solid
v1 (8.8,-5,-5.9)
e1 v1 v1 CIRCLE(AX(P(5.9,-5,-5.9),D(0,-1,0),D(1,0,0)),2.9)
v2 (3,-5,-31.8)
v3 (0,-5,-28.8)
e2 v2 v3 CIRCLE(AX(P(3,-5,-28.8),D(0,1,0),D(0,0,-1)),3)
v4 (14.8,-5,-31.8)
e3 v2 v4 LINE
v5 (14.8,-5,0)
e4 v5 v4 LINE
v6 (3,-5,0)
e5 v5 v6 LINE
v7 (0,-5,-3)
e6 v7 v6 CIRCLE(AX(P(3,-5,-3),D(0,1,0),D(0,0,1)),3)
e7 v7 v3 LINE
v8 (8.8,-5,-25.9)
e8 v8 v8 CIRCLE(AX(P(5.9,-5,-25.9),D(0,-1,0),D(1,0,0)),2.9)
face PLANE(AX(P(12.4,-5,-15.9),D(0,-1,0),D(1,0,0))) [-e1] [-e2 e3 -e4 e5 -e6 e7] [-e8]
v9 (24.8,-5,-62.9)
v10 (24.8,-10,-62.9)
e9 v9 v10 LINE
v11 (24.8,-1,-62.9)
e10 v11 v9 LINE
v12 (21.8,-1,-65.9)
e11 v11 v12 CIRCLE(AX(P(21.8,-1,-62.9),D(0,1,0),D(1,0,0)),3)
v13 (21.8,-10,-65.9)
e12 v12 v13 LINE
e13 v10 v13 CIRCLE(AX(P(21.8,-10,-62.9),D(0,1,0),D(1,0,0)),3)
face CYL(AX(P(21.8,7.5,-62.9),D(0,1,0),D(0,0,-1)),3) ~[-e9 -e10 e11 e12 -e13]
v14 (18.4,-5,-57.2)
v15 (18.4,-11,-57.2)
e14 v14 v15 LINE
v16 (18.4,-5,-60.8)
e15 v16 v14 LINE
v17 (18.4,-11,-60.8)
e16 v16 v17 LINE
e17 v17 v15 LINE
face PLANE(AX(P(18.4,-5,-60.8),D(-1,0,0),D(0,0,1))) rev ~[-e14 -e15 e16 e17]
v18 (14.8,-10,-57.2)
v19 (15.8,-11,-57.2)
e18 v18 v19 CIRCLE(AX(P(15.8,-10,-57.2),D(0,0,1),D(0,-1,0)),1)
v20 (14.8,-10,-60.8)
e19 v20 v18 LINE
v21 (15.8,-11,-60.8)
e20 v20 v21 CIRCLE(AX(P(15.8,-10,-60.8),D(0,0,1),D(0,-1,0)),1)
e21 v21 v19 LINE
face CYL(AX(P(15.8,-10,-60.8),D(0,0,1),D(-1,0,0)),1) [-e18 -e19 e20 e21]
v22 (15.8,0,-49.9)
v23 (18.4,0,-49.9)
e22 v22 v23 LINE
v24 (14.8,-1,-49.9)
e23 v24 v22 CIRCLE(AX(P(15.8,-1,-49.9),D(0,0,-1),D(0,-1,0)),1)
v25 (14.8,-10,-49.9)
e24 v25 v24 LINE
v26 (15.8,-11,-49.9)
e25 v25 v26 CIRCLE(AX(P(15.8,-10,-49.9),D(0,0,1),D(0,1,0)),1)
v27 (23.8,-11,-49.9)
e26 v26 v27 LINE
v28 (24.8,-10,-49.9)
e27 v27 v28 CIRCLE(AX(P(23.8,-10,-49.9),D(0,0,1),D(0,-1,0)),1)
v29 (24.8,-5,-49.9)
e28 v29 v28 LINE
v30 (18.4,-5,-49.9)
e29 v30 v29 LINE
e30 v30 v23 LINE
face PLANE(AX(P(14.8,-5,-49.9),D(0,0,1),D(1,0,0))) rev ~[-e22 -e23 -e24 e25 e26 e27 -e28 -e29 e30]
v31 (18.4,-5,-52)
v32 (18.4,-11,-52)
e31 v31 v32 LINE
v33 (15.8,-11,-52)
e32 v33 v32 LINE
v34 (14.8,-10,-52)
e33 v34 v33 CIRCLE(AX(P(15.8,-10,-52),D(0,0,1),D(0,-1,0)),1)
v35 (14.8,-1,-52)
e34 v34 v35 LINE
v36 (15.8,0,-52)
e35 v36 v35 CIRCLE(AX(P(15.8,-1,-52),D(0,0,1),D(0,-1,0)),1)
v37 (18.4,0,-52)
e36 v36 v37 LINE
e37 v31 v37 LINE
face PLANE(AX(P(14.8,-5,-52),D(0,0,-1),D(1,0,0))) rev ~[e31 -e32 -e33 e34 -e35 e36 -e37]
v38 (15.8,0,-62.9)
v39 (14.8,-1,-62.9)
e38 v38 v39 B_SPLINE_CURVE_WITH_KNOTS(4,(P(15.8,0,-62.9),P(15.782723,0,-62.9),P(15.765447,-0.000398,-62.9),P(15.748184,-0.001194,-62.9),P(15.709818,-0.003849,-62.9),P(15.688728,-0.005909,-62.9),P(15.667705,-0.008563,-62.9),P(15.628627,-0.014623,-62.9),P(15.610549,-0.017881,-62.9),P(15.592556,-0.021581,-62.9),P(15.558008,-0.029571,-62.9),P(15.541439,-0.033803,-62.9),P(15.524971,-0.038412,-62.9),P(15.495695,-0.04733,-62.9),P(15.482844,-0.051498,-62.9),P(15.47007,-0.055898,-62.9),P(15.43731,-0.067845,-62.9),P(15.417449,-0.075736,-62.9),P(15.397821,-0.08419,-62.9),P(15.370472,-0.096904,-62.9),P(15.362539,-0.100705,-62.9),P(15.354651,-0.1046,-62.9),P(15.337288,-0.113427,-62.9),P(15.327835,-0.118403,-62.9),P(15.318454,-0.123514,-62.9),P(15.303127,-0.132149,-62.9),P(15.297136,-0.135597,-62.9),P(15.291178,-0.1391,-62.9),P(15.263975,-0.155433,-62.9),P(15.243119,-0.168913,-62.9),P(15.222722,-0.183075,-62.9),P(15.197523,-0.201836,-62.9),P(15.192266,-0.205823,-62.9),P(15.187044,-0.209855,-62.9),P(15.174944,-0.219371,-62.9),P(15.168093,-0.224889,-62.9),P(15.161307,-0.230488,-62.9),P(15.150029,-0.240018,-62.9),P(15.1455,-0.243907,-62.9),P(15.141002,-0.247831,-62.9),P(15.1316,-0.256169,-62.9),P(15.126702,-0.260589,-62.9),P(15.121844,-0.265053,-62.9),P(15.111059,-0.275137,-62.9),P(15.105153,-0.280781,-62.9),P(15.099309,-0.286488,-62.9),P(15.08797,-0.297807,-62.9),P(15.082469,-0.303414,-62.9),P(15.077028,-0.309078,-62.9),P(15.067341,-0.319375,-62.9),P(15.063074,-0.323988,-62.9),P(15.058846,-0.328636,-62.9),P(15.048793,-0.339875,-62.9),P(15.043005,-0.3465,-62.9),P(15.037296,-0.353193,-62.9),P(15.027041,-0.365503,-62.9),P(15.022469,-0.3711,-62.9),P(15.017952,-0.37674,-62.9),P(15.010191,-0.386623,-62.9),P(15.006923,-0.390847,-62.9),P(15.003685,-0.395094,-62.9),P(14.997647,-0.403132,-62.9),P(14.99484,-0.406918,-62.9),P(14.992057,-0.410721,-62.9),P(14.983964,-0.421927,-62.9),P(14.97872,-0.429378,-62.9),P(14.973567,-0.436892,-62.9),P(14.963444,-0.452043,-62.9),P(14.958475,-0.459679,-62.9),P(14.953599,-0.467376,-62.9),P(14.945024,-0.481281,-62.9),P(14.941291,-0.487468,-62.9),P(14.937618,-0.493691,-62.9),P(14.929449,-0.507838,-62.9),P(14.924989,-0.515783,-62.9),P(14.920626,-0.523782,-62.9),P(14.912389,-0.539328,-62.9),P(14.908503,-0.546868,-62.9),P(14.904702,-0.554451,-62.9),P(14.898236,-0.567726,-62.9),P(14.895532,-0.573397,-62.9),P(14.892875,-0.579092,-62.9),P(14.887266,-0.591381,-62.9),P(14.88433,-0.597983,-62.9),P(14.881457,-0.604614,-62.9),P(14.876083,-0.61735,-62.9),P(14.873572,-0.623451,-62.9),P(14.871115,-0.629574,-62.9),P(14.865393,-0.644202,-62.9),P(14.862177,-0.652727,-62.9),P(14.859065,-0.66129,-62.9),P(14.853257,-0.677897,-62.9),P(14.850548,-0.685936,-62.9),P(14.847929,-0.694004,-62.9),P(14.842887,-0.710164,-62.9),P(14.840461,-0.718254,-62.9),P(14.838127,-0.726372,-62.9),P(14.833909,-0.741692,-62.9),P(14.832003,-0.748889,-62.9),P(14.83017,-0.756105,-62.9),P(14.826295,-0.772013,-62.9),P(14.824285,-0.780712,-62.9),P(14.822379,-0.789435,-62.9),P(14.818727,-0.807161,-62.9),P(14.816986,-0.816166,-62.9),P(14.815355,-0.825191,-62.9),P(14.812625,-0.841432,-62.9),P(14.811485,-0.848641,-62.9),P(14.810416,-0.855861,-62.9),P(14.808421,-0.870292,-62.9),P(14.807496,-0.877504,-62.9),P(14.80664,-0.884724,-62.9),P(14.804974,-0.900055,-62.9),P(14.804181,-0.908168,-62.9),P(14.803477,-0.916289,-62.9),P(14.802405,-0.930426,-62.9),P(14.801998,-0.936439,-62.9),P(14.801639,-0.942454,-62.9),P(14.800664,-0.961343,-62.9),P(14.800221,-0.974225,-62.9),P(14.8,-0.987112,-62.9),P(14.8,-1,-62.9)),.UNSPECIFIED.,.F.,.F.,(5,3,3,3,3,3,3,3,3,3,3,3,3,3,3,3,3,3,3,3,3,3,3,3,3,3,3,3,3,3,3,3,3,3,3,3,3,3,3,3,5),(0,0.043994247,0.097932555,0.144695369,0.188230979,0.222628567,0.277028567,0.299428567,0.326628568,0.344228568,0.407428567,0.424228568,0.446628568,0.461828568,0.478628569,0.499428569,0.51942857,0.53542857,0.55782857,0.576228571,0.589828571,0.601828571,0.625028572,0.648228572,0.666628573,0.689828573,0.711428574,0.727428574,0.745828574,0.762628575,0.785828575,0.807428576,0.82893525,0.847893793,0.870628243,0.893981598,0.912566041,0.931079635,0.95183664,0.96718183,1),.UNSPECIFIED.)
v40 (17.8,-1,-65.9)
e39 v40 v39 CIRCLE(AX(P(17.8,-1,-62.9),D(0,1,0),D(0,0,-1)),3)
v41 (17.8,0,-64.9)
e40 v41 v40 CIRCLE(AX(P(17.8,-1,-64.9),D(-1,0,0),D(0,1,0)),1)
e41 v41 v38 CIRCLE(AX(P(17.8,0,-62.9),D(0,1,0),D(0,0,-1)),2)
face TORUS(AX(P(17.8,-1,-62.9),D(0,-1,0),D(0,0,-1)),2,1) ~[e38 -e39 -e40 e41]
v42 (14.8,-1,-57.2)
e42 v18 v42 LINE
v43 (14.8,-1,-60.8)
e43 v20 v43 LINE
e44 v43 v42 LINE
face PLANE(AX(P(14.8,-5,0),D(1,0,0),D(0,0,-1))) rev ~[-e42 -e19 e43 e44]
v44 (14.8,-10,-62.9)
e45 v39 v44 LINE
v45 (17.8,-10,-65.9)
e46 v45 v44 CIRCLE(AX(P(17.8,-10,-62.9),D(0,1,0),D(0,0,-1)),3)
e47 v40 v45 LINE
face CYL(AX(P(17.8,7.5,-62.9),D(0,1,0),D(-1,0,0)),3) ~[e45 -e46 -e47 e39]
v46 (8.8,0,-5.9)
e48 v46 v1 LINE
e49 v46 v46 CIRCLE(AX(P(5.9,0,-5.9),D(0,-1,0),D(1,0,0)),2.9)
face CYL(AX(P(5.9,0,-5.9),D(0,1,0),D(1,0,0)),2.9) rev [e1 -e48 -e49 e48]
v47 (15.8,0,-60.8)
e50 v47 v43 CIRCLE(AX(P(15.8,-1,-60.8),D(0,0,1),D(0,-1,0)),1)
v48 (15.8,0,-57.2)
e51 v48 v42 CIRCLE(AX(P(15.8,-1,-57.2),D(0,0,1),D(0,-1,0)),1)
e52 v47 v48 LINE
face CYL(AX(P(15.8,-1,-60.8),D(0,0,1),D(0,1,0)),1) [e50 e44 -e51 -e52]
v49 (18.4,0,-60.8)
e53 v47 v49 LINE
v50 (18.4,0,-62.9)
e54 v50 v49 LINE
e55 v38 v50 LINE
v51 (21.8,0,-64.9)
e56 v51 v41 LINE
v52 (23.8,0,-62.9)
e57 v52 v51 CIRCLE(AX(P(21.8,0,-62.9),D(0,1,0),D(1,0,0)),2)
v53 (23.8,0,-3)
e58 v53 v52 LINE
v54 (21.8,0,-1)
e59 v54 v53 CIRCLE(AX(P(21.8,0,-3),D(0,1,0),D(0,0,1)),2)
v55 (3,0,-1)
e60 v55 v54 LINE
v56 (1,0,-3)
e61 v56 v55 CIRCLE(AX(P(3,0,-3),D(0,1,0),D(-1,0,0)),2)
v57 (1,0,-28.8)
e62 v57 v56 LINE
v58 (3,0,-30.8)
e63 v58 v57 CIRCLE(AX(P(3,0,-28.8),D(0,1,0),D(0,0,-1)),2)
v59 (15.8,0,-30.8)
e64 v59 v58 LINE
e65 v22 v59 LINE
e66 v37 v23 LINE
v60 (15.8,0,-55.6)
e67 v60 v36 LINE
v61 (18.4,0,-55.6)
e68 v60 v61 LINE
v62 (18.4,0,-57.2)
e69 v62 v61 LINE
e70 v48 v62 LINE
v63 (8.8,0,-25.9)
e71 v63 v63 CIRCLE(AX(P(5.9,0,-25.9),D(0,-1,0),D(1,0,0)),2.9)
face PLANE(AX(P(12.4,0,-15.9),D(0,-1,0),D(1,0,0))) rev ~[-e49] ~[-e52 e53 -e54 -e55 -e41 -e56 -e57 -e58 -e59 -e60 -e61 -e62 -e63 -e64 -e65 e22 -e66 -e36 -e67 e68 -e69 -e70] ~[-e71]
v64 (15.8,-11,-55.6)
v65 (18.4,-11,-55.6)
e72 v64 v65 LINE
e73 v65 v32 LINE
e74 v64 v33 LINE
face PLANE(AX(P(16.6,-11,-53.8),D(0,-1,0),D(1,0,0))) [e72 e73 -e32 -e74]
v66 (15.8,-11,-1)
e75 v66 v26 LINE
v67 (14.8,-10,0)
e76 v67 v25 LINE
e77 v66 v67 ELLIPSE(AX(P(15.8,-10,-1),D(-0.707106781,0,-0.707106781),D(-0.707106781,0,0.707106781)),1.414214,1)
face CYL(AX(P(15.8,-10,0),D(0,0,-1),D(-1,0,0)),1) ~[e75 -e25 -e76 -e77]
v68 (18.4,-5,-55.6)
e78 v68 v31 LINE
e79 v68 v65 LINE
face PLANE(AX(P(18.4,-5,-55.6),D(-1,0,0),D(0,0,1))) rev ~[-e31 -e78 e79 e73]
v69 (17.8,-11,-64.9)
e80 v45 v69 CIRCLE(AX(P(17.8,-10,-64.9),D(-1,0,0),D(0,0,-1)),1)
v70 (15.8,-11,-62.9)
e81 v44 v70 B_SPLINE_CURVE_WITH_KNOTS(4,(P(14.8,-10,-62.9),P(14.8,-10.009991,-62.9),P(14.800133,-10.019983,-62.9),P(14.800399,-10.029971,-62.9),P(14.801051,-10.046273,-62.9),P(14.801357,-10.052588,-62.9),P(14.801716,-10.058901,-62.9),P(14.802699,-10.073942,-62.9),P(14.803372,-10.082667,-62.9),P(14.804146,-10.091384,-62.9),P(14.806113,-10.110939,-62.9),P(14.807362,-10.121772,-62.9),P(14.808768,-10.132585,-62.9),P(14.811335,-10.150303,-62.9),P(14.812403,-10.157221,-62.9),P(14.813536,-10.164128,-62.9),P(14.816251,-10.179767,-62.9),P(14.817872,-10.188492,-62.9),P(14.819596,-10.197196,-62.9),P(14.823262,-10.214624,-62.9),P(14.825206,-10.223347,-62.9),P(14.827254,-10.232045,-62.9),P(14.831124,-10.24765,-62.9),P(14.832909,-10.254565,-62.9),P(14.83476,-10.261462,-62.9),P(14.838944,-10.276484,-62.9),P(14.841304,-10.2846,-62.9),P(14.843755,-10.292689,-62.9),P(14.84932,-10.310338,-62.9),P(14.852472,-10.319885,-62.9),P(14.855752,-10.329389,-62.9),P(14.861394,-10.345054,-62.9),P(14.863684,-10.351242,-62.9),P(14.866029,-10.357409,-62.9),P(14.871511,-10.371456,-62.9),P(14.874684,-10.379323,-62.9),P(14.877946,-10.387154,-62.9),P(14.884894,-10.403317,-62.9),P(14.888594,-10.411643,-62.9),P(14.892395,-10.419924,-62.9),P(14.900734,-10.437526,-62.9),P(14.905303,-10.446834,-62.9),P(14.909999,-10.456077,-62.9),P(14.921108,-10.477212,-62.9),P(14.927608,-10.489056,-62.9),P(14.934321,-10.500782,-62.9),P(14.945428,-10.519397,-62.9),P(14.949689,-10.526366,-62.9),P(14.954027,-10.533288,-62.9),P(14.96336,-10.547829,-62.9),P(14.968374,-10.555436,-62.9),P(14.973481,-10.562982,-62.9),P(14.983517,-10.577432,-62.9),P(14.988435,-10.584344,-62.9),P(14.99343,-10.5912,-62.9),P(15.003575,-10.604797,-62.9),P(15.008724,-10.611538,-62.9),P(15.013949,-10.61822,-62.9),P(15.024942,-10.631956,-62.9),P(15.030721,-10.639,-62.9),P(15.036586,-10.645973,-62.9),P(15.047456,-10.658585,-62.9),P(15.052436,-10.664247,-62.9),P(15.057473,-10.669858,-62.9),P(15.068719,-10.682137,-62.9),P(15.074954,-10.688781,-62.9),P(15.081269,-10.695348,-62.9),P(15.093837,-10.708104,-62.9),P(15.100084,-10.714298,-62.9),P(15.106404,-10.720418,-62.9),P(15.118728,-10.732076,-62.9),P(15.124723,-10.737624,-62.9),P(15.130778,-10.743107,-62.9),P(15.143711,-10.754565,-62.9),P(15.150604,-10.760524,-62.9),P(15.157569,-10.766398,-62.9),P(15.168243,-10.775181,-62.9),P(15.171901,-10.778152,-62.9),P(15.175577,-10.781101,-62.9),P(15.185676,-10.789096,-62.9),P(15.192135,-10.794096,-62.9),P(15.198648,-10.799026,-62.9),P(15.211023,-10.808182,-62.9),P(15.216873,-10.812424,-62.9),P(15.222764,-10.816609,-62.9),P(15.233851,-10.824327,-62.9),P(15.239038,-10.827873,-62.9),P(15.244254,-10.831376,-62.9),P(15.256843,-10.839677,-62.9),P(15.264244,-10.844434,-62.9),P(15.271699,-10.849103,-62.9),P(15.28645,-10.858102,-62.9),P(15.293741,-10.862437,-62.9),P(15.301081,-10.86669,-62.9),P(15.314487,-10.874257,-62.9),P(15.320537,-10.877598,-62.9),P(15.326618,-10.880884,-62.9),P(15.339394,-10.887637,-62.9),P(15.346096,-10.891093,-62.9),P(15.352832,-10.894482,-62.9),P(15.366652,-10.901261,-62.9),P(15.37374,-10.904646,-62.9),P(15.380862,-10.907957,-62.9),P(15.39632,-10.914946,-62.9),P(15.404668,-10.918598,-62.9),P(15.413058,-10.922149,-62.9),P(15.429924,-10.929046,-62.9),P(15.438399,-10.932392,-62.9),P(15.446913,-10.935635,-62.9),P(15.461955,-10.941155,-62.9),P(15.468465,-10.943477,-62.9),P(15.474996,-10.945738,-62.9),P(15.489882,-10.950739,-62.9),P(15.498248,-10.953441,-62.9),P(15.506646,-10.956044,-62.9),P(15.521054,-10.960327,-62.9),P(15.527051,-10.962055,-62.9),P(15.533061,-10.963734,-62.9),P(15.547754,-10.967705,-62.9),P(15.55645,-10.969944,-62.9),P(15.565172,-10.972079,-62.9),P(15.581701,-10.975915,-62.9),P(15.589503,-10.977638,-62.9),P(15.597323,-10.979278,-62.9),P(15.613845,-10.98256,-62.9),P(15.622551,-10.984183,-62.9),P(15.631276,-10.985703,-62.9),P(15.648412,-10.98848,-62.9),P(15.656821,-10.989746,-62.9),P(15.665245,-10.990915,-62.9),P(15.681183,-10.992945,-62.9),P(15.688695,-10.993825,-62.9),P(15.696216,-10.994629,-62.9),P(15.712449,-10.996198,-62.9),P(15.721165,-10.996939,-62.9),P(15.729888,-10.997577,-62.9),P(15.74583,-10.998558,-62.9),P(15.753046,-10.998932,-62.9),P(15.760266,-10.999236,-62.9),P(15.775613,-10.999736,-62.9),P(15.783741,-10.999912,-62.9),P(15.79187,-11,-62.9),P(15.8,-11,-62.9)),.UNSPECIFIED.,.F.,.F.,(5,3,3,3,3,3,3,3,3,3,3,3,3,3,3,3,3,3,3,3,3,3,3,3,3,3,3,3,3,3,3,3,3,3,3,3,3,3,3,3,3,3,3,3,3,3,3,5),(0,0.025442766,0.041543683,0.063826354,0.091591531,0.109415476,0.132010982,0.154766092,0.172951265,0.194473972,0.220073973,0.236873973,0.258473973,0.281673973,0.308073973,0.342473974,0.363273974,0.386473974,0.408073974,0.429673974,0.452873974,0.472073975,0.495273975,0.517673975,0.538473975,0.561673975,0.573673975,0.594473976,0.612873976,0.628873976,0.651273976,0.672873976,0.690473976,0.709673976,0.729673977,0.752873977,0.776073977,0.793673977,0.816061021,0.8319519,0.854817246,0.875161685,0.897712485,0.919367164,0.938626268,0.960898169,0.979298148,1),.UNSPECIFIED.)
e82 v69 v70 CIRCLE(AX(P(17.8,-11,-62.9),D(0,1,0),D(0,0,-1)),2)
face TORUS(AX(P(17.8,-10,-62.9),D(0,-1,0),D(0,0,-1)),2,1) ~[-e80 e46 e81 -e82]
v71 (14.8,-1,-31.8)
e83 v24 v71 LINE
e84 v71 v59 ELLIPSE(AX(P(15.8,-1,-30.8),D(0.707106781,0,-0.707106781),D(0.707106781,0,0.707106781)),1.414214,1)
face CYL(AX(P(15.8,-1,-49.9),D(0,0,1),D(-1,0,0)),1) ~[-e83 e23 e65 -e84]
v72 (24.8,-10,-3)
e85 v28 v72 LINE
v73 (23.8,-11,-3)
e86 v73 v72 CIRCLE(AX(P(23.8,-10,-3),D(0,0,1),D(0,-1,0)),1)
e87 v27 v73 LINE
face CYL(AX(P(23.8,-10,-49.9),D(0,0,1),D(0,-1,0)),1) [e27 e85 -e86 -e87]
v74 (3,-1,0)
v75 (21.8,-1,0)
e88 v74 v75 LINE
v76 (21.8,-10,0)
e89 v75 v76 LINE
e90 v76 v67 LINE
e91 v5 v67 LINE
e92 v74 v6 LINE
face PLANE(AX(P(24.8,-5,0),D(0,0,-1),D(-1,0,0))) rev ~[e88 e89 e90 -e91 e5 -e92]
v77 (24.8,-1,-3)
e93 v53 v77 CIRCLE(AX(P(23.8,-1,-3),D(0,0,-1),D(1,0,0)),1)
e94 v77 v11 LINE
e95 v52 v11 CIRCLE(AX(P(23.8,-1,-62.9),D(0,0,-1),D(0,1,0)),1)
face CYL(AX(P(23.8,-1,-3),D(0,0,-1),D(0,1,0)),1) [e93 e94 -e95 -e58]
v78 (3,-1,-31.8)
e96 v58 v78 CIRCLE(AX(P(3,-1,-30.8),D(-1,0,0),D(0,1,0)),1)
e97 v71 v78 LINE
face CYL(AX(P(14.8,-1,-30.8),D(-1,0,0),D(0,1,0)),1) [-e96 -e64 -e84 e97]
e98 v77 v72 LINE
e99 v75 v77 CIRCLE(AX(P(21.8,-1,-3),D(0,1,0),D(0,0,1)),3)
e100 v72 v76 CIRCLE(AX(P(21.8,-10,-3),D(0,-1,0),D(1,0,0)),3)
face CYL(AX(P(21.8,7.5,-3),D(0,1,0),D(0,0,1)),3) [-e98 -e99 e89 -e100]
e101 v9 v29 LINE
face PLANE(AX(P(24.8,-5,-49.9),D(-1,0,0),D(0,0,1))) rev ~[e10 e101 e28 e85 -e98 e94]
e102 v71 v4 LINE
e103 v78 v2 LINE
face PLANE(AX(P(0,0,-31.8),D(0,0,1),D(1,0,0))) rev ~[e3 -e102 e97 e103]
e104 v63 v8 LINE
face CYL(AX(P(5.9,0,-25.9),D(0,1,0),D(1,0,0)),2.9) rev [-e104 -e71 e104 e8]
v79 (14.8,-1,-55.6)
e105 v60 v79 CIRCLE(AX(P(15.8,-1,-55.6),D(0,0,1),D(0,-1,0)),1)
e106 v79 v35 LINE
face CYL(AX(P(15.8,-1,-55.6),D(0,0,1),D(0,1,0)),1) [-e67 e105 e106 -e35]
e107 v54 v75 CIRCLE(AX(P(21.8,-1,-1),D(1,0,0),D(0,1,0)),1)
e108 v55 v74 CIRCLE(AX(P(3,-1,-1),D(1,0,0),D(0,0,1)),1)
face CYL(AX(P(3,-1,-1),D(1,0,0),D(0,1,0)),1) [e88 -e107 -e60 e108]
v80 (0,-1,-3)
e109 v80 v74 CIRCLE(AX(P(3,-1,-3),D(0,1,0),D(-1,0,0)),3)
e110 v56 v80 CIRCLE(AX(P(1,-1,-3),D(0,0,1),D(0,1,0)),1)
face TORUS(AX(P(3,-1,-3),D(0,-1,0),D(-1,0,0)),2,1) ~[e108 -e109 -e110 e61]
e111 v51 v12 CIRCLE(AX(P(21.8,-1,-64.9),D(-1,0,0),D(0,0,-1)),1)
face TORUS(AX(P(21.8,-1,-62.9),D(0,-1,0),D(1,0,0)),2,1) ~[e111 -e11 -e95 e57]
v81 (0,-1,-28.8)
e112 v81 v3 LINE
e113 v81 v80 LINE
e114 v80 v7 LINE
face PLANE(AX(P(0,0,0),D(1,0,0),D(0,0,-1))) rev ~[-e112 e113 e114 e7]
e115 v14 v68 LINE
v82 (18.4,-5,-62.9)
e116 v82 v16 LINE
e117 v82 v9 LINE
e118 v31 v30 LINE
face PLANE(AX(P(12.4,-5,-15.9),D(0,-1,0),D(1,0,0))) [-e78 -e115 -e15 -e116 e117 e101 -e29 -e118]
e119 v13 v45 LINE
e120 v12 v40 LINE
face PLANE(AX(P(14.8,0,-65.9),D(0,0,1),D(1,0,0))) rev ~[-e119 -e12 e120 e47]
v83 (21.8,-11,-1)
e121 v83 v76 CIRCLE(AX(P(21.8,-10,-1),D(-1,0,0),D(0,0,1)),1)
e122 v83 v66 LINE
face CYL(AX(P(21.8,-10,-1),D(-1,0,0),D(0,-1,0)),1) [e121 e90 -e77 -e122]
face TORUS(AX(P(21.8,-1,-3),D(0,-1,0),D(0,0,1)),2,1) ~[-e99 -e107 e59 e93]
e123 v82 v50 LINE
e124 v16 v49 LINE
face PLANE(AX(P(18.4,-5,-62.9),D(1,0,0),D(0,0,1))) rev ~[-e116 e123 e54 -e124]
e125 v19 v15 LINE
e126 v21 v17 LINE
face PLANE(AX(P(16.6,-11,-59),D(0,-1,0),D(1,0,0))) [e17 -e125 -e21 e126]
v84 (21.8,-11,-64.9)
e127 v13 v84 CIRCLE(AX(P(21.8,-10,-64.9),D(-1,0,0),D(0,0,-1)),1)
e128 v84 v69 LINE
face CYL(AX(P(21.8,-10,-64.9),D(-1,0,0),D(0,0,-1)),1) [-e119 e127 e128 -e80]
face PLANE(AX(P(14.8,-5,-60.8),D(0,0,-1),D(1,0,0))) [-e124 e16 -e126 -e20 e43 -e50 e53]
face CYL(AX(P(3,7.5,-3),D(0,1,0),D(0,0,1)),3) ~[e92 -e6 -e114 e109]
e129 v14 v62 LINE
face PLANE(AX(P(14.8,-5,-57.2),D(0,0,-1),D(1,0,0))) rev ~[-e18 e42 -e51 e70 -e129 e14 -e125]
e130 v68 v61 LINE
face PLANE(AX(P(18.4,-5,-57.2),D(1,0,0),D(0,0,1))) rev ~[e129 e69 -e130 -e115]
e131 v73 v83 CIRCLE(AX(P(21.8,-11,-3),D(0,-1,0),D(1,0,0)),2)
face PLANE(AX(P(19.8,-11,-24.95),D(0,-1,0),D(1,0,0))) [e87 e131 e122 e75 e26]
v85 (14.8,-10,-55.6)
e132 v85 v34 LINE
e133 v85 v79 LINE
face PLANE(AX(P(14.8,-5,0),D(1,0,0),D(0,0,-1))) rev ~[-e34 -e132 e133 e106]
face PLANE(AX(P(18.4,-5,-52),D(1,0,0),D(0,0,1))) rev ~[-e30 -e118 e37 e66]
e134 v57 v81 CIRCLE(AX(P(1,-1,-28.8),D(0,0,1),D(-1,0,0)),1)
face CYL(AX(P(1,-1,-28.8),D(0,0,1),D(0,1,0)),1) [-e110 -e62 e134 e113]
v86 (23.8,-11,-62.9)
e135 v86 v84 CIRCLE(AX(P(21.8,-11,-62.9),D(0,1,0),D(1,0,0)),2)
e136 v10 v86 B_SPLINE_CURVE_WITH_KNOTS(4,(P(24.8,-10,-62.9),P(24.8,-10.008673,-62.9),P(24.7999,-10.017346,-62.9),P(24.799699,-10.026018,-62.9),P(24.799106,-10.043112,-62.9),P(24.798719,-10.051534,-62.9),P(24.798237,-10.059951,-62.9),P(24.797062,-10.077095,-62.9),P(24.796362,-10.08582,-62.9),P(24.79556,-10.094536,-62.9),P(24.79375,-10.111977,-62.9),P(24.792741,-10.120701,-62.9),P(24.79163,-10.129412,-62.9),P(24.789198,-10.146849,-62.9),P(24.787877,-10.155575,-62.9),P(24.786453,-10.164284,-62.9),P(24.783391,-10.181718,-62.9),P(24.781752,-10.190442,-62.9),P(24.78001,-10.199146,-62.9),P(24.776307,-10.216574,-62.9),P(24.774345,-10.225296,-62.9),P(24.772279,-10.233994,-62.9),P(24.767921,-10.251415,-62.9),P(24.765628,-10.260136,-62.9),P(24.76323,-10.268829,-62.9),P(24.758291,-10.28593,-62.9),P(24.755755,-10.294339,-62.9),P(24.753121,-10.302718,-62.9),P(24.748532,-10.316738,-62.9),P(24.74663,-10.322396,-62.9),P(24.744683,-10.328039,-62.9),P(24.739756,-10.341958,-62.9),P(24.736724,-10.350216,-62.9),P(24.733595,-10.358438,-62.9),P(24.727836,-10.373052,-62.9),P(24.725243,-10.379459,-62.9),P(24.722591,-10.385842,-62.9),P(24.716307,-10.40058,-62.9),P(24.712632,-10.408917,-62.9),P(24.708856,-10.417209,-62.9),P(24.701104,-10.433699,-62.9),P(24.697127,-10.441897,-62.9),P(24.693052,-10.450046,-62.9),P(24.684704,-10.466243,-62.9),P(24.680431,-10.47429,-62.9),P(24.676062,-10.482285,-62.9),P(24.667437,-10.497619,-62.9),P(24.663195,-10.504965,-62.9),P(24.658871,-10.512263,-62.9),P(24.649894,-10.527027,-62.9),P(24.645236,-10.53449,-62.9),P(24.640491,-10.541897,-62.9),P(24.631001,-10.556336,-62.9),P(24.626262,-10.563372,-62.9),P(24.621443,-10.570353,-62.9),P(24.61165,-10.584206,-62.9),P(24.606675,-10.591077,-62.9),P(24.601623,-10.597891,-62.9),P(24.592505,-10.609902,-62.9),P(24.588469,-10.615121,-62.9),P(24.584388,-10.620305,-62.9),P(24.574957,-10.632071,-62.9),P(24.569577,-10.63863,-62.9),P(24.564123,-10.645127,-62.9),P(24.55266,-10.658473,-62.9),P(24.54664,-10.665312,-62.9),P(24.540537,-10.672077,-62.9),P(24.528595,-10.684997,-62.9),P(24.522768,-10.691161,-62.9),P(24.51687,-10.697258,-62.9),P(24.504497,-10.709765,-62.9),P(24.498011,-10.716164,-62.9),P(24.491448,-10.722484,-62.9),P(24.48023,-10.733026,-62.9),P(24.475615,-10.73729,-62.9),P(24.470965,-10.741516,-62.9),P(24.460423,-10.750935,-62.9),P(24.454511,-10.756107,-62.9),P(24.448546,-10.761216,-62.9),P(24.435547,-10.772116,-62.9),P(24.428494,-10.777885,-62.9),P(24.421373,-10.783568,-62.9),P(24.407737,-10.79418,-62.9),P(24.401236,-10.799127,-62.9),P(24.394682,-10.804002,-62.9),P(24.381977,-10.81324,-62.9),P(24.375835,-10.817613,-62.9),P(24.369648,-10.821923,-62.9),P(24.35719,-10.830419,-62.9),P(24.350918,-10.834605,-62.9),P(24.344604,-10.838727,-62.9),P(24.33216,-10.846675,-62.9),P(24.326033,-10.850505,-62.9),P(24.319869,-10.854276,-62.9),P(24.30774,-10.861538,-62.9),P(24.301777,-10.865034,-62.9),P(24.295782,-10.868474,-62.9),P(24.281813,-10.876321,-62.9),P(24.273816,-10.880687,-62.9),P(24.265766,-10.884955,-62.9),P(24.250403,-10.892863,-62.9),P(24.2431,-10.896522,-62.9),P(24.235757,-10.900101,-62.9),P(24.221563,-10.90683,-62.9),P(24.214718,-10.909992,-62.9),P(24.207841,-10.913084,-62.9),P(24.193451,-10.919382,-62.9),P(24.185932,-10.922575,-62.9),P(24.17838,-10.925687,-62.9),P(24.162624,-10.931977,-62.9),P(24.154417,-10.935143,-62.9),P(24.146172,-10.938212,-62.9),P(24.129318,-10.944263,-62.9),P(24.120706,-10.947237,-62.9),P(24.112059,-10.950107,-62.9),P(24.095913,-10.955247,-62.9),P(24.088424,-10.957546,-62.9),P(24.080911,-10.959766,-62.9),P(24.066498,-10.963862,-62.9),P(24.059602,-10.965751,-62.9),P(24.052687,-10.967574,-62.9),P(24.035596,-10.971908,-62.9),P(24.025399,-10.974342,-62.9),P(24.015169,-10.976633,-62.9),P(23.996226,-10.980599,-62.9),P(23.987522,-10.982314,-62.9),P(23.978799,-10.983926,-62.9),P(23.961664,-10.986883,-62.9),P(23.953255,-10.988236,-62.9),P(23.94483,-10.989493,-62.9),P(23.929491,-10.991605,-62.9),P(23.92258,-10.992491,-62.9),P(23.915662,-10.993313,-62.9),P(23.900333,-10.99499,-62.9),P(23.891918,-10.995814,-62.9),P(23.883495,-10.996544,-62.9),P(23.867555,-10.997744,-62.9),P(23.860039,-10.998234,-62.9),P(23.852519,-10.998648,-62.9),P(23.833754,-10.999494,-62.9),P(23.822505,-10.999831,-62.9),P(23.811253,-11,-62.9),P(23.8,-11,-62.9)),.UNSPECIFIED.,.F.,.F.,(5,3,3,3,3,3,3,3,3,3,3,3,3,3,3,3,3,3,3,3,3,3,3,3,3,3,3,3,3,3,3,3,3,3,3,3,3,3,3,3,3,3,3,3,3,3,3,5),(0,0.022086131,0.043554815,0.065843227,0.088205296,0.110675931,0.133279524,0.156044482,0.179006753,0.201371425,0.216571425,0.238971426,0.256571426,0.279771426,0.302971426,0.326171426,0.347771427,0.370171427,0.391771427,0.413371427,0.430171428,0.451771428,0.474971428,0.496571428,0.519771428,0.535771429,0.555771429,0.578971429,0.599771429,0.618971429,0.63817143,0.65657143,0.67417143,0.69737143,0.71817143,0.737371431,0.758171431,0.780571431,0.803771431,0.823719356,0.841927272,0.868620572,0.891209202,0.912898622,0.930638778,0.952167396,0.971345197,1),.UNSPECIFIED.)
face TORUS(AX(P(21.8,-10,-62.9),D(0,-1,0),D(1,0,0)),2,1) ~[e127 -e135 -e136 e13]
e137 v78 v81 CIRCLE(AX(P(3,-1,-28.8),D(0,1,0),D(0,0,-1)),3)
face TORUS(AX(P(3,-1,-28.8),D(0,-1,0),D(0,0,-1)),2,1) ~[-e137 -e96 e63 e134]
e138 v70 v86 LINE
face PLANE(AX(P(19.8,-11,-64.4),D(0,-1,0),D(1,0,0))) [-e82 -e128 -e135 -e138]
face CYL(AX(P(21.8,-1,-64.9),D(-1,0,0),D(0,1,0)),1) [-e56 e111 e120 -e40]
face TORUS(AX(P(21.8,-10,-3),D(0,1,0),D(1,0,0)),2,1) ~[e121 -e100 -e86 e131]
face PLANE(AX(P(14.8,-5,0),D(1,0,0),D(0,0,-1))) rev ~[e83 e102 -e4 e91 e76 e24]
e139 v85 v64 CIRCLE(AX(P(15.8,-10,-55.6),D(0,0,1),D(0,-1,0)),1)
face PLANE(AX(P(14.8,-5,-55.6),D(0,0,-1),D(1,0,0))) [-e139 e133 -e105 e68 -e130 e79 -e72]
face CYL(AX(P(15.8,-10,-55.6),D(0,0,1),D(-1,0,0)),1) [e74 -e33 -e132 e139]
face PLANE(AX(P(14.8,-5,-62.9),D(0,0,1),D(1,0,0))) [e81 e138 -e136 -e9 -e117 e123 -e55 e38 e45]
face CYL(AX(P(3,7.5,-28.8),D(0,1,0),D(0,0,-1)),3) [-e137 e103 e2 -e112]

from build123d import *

# Parameters (mm, degrees)
F0_R        = 2.9
F0_W        = 10
F0_H        = 34.1
F1_DEPTH    = 5
F2_W        = 10
F2_H        = 3
F3_DEPTH    = 6
F4_W        = 3.6
F4_H        = 3.6
F5_DEPTH    = 6
F6_W        = 3.6
F6_H        = 2.1
F6_H_2      = 1.6
F7_DEPTH    = 5.001
F8_T1_DEPTH = 20
F8_T3_DEPTH = 26
F9_R        = 1


# Not quite as in the source:
# - a fillet or chamfer that OpenCascade refuses, or shapes differently, is made with other operations: its cross-section is extruded or revolved along the edge and cut away or added


with BuildPart() as f1:
    # F0 (on Front) → F1 (new body)
    with BuildSketch(Plane.XZ):
        Polygon((24.8, 0), (0, 0), (0, -31.8), (14.8, -31.8), (24.8, -31.8), align=None)
        with Locations((5.9, -25.9)):
            Circle(F0_R, mode=Mode.SUBTRACT)
        with Locations((5.9, -5.9)):
            Circle(F0_R, mode=Mode.SUBTRACT)
        with Locations((19.8, -48.85)):
            Rectangle(F0_W, F0_H)
    extrude(amount=F1_DEPTH)

    # F2 (on face) → F3 (join)
    with BuildSketch(Plane.XZ.offset(5)):
        Polygon((14.8, -49.9), (24.8, -49.9), (24.8, 0), (14.8, 0), (14.8, -31.8), align=None)
        with Locations((19.8, -64.4)):
            Rectangle(F2_W, F2_H)
    extrude(amount=F3_DEPTH)

    # F4 (on face) → F5 (join, through all)
    with BuildSketch(Plane.XZ.offset(5)):
        with Locations((16.6, -53.8)):
            Rectangle(F4_W, F4_H)
        with Locations((16.6, -59)):
            Rectangle(F4_W, F4_H)
    extrude(amount=F5_DEPTH)

    # F6 (on face) → F7 (cut, through all)
    with BuildSketch(Plane.XZ.offset(5)):
        with Locations((16.6, -50.95)):
            Rectangle(F6_W, F6_H)
        with Locations((16.6, -56.4)):
            Rectangle(F6_W, F6_H_2)
        with Locations((16.6, -61.85)):
            Rectangle(F6_W, F6_H)
    extrude(amount=-F7_DEPTH, mode=Mode.SUBTRACT)

    # F8: fillet of radius 3 on 5 edges, made by hand

    # F8_s2 → F8_t1 (cut)
    with BuildSketch(Plane.XZ.offset(-7.5)):
        with BuildLine():
            ThreePointArc((3, -31.8), (0.8786796564, -30.9213203436), (0, -28.8))
            Line((0, -28.8), (0, -31.8))
            Line((0, -31.8), (3, -31.8))
        make_face()
        with BuildLine():
            ThreePointArc((3, 0), (0.8786796564, -0.8786796564), (0, -3))
            Line((0, -3), (0, 0))
            Line((0, 0), (3, 0))
        make_face()
    extrude(amount=F8_T1_DEPTH, mode=Mode.SUBTRACT)

    # F8_s4 → F8_t3 (cut)
    with BuildSketch(Plane.XZ.offset(-7.5)):
        with BuildLine():
            ThreePointArc((21.8, 0), (23.9213203436, -0.8786796564), (24.8, -3))
            Line((24.8, -3), (24.8, 0))
            Line((24.8, 0), (21.8, 0))
        make_face()
        with BuildLine():
            ThreePointArc((21.8, -65.9), (23.9213203436, -65.0213203436), (24.8, -62.9))
            Line((24.8, -62.9), (24.8, -65.9))
            Line((24.8, -65.9), (21.8, -65.9))
        make_face()
        with BuildLine():
            ThreePointArc((14.8, -62.9), (15.6786796564, -65.0213203436), (17.8, -65.9))
            Line((17.8, -65.9), (14.8, -65.9))
            Line((14.8, -65.9), (14.8, -62.9))
        make_face()
    extrude(amount=F8_T3_DEPTH, mode=Mode.SUBTRACT)

    # F9
    f9_edges = [f1.edges().sort_by_distance(p)[0] for p in [
        (14.8, 0, -53.8),
        (14.8, 0, -59),
        (14.8, 0, -40.85),
        (24.8, -11, -26.45),
        (15.67868, 0, -65.02132),
        (14.8, -11, -24.95),
        (23.92132, -11, -65.02132),
        (12.4, 0, 0),
        (18.3, -11, 0),
        (23.92132, 0, -0.87868),
        (23.92132, -11, -0.87868),
        (8.9, 0, -31.8),
        (0.87868, 0, -30.92132),
        (0, 0, -15.9),
        (0.87868, 0, -0.87868),
        (24.8, 0, -32.95),
        (23.92132, 0, -65.02132),
        (19.8, 0, -65.9),
        (15.67868, -11, -65.02132),
        (14.8, -11, -59),
        (14.8, -11, -53.8),
        (19.8, -11, -65.9),
    ]]
    fillet(f9_edges, radius=F9_R)


solid = f1.part
